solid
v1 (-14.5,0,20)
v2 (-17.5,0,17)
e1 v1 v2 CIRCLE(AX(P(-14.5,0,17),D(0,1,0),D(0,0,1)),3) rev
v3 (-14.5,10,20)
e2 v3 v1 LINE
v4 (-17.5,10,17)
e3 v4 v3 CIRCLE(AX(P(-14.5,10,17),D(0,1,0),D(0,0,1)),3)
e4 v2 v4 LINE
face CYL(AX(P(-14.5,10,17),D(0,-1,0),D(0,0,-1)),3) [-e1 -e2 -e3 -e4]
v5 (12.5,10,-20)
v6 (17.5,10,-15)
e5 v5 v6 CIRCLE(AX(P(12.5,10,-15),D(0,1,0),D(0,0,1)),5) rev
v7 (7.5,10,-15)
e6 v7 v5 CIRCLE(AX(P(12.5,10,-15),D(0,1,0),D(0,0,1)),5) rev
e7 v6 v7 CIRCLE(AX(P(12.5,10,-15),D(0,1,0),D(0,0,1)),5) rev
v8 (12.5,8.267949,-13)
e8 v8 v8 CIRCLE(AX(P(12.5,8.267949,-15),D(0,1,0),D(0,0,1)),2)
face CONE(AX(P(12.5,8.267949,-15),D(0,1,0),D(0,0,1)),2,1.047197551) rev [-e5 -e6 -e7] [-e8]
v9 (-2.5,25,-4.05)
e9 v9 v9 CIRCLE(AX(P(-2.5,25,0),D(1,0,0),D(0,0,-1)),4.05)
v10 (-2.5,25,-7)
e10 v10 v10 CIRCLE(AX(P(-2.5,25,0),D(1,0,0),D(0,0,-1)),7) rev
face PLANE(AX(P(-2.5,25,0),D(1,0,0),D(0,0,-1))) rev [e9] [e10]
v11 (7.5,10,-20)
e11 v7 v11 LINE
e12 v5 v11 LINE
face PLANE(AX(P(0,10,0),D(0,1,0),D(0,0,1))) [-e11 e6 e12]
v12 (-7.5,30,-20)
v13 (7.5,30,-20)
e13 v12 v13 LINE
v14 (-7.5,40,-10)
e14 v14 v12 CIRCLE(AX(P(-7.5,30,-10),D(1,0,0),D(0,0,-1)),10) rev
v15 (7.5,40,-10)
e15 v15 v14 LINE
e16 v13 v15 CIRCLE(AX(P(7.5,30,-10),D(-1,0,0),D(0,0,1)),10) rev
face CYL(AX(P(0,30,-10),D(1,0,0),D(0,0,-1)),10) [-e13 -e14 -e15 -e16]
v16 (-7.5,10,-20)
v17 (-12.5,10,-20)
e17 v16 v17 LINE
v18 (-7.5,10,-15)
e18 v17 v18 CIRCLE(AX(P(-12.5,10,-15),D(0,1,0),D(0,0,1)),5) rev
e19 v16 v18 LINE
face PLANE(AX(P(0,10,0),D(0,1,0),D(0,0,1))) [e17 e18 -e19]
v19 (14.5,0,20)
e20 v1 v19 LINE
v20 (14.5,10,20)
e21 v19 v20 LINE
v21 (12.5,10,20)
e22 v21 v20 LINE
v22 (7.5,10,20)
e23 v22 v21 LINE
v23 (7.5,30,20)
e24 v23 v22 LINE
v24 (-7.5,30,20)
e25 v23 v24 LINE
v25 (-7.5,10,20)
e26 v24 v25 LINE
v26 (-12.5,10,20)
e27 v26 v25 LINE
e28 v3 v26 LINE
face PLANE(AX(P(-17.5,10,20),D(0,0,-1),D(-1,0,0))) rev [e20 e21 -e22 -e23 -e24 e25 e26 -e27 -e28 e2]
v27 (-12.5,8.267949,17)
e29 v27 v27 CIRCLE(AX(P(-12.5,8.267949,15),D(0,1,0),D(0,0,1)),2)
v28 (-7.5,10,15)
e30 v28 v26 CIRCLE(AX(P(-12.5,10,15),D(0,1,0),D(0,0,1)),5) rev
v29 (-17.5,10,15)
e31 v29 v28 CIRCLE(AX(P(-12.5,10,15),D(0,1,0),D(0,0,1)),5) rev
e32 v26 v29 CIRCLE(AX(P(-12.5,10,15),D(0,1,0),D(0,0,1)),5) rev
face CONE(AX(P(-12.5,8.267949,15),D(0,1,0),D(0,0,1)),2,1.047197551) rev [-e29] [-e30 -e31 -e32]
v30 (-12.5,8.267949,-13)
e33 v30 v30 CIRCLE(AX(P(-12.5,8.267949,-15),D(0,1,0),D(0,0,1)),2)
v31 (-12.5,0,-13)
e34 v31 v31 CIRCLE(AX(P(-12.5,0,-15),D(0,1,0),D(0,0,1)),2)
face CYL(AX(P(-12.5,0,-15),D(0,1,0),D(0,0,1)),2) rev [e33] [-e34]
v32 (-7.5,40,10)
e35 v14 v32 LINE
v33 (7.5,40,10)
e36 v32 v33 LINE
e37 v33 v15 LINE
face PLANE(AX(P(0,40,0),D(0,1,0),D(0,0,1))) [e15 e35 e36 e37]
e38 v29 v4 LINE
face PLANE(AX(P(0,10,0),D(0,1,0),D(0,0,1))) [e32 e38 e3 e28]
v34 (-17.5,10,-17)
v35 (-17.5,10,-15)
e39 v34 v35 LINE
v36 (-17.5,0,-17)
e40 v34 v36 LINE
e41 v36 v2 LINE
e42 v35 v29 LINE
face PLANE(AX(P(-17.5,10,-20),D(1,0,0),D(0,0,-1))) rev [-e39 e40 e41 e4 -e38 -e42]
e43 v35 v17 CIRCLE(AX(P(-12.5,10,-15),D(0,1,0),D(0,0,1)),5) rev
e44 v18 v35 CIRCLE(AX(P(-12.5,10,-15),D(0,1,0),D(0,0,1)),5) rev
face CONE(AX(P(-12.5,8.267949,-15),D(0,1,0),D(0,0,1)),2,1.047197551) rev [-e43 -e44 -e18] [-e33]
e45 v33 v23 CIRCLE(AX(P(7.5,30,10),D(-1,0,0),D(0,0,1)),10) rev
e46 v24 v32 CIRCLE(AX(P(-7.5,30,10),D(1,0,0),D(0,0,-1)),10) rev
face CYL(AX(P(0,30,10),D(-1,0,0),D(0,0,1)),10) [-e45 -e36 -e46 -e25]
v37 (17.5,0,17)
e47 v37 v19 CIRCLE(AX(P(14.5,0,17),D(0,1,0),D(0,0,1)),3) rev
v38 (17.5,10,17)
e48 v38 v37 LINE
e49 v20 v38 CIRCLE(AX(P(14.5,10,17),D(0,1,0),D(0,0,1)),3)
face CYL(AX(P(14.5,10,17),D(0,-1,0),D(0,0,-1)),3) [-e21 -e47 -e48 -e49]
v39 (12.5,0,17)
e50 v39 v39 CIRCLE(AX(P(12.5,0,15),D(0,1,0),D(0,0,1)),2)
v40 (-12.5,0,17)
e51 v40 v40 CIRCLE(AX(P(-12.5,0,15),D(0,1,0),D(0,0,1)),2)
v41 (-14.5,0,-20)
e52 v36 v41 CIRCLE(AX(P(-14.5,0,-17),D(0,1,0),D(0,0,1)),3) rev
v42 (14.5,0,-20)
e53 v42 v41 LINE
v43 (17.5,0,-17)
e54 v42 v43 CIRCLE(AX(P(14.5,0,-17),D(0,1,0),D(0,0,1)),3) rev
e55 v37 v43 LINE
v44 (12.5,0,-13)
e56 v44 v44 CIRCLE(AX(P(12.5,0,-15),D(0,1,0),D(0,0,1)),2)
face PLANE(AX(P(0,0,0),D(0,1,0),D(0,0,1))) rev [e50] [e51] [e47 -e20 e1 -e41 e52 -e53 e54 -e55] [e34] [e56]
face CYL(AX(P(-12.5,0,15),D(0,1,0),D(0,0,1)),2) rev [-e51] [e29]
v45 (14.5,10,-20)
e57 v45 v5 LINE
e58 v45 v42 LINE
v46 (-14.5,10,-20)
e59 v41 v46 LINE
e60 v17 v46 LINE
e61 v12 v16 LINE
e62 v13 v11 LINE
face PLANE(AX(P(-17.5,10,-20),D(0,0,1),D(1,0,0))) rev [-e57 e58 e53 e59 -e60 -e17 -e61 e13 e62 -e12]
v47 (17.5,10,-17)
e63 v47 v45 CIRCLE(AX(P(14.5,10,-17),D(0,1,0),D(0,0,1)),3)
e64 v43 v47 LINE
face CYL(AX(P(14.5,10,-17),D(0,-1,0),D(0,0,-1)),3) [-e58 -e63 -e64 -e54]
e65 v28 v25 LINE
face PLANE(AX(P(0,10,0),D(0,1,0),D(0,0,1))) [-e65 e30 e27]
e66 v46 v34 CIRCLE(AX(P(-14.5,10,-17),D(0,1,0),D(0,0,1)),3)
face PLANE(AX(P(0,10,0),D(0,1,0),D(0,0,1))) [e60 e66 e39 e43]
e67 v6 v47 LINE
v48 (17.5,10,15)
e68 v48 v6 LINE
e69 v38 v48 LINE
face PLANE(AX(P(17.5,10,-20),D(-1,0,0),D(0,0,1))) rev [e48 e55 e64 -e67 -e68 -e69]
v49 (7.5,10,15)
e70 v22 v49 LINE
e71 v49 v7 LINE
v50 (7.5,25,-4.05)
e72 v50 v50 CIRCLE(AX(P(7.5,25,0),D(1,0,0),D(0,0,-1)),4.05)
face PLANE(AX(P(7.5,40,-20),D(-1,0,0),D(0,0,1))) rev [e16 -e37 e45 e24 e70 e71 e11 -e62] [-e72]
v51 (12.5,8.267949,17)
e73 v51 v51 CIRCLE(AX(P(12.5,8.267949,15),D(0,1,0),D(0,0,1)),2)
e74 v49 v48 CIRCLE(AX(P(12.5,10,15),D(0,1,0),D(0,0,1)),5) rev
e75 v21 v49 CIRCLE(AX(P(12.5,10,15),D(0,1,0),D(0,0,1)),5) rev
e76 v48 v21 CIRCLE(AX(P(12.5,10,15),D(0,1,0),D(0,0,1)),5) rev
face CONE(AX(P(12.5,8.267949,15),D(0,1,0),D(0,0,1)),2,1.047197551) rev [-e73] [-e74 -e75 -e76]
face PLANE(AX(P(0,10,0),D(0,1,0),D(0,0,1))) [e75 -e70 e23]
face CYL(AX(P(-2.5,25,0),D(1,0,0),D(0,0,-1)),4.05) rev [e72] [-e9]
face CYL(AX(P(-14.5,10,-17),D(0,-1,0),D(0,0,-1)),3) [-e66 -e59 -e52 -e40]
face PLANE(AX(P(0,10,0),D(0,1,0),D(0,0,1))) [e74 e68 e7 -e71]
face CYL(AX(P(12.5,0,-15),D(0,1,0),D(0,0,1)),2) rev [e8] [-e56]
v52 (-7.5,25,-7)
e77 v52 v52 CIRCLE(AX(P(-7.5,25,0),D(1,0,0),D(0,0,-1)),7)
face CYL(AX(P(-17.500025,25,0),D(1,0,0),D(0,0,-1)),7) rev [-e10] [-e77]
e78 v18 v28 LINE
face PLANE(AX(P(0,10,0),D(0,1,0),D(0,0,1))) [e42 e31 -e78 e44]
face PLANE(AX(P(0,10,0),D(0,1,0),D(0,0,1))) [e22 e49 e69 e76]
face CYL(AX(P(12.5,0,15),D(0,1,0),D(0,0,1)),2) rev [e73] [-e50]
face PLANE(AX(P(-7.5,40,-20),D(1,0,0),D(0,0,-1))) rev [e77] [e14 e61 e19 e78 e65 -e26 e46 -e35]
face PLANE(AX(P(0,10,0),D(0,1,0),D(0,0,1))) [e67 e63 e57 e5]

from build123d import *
from OCP.BRepFilletAPI import BRepFilletAPI_MakeChamfer

# Parameters (mm, degrees)
SKETCH_2_W          = 35
SKETCH_2_H          = 40
EXTRUDE_1_DEPTH     = 10
SKETCH_3_R          = 2
CUT_EXTRUDE_2_DEPTH = 10
SKETCH_4_W          = 15
SKETCH_4_H          = 40
EXTRUDE_2_DEPTH     = 30
SKETCH_5_R          = 7
CUT_EXTRUDE_3_DEPTH = 52.23475383
FILLET_2_R          = 3
FILLET_3_R          = 10
CHAMFER_1_SIZE      = 3
CHAMFER_1_SIZE_2    = 1.732050808
SKETCH_6_R          = 7
SKETCH_6_R_2        = 4.05
EXTRUDE_3_DEPTH     = 10


with BuildPart() as part:
    # 草图2 → 凸台-拉伸1 (new body)
    with BuildSketch(Plane(origin=(0, 0, 0), x_dir=(1, 0, 0), z_dir=(0, 1, 0))):
        Rectangle(SKETCH_2_W, SKETCH_2_H)
    extrude(amount=EXTRUDE_1_DEPTH)

    # 草图3 → 切除-拉伸2 (cut)
    with BuildSketch(Plane(origin=(0, 10, 0), x_dir=(1, 0, 0), z_dir=(0, 1, 0))):
        with Locations(Location((12.5, 15, 0), (0, 0, 270))):
            Circle(SKETCH_3_R)
        with Locations(Location((-12.5, 15, 0), (0, 0, 270))):
            Circle(SKETCH_3_R)
        with Locations(Location((-12.5, -15, 0), (0, 0, 270))):
            Circle(SKETCH_3_R)
        with Locations(Location((12.5, -15, 0), (0, 0, 270))):
            Circle(SKETCH_3_R)
    extrude(amount=-CUT_EXTRUDE_2_DEPTH, mode=Mode.SUBTRACT)

    # 草图4 → 凸台-拉伸2 (add)
    with BuildSketch(Plane(origin=(0, 10, 0), x_dir=(1, 0, 0), z_dir=(0, 1, 0))):
        Rectangle(SKETCH_4_W, SKETCH_4_H)
    extrude(amount=EXTRUDE_2_DEPTH)

    # 草图5 → 切除-拉伸3 (cut, through all)
    with BuildSketch(Plane(origin=(7.5, 0, 0), x_dir=(0, 0, -1), z_dir=(1, 0, 0))):
        with Locations((0, 25)):
            Circle(SKETCH_5_R)
    extrude(amount=-CUT_EXTRUDE_3_DEPTH, mode=Mode.SUBTRACT)

    # 圆角2
    fillet_2_edges = [part.edges().sort_by_distance(p)[0] for p in [
        (17.5, 5, -20),
        (-17.5, 5, -20),
        (-17.5, 5, 20),
        (17.5, 5, 20),
    ]]
    fillet(fillet_2_edges, radius=FILLET_2_R)

    # 圆角3
    fillet_3_edges = [part.edges().sort_by_distance(p)[0] for p in [
        (0, 40, 20),
        (0, 40, -20),
    ]]
    fillet(fillet_3_edges, radius=FILLET_3_R)

    # 倒角1
    chamfer_1_edges_1 = [part.edges().sort_by_distance(p)[0] for p in [
        (-12.5, 10, -17),
    ]]
    chamfer_1_side_1 = [part.faces().sort_by_distance(p)[0] for p in [
        (-12.5, 10, -17.034641016),
    ]]
    chamfer_1_edges_2 = [part.edges().sort_by_distance(p)[0] for p in [
        (-12.5, 10, 13),
    ]]
    chamfer_1_side_2 = [part.faces().sort_by_distance(p)[0] for p in [
        (-12.5, 10, 12.965358984),
    ]]
    chamfer_1_edges_3 = [part.edges().sort_by_distance(p)[0] for p in [
        (12.5, 10, 13),
    ]]
    chamfer_1_side_3 = [part.faces().sort_by_distance(p)[0] for p in [
        (12.5, 10, 12.965358984),
    ]]
    chamfer_1_edges_4 = [part.edges().sort_by_distance(p)[0] for p in [
        (12.5, 10, -17),
    ]]
    chamfer_1_side_4 = [part.faces().sort_by_distance(p)[0] for p in [
        (12.5, 10, -17.034641016),
    ]]
    chamfer_1 = BRepFilletAPI_MakeChamfer(part.part.solid().wrapped)
    for e in chamfer_1_edges_1:
        chamfer_1.Add(CHAMFER_1_SIZE - 0.0001, CHAMFER_1_SIZE_2 - 0.0001, e.wrapped, chamfer_1_side_1[0].wrapped)
    for e in chamfer_1_edges_2:
        chamfer_1.Add(CHAMFER_1_SIZE - 0.0001, CHAMFER_1_SIZE_2 - 0.0001, e.wrapped, chamfer_1_side_2[0].wrapped)
    for e in chamfer_1_edges_3:
        chamfer_1.Add(CHAMFER_1_SIZE - 0.0001, CHAMFER_1_SIZE_2 - 0.0001, e.wrapped, chamfer_1_side_3[0].wrapped)
    for e in chamfer_1_edges_4:
        chamfer_1.Add(CHAMFER_1_SIZE - 0.0001, CHAMFER_1_SIZE_2 - 0.0001, e.wrapped, chamfer_1_side_4[0].wrapped)
    add(Compound.cast(chamfer_1.Shape()), mode=Mode.REPLACE)  # a hair under: the kernel refuses the full size

    # 草图6 → 凸台-拉伸3 (add)
    with BuildSketch(Plane(origin=(7.5, 0, 0), x_dir=(0, 0, -1), z_dir=(1, 0, 0))):
        with Locations((0, 25)):
            Circle(SKETCH_6_R)
        with Locations((0, 25)):
            Circle(SKETCH_6_R_2, mode=Mode.SUBTRACT)
    extrude(amount=-EXTRUDE_3_DEPTH)


solid = part.part
